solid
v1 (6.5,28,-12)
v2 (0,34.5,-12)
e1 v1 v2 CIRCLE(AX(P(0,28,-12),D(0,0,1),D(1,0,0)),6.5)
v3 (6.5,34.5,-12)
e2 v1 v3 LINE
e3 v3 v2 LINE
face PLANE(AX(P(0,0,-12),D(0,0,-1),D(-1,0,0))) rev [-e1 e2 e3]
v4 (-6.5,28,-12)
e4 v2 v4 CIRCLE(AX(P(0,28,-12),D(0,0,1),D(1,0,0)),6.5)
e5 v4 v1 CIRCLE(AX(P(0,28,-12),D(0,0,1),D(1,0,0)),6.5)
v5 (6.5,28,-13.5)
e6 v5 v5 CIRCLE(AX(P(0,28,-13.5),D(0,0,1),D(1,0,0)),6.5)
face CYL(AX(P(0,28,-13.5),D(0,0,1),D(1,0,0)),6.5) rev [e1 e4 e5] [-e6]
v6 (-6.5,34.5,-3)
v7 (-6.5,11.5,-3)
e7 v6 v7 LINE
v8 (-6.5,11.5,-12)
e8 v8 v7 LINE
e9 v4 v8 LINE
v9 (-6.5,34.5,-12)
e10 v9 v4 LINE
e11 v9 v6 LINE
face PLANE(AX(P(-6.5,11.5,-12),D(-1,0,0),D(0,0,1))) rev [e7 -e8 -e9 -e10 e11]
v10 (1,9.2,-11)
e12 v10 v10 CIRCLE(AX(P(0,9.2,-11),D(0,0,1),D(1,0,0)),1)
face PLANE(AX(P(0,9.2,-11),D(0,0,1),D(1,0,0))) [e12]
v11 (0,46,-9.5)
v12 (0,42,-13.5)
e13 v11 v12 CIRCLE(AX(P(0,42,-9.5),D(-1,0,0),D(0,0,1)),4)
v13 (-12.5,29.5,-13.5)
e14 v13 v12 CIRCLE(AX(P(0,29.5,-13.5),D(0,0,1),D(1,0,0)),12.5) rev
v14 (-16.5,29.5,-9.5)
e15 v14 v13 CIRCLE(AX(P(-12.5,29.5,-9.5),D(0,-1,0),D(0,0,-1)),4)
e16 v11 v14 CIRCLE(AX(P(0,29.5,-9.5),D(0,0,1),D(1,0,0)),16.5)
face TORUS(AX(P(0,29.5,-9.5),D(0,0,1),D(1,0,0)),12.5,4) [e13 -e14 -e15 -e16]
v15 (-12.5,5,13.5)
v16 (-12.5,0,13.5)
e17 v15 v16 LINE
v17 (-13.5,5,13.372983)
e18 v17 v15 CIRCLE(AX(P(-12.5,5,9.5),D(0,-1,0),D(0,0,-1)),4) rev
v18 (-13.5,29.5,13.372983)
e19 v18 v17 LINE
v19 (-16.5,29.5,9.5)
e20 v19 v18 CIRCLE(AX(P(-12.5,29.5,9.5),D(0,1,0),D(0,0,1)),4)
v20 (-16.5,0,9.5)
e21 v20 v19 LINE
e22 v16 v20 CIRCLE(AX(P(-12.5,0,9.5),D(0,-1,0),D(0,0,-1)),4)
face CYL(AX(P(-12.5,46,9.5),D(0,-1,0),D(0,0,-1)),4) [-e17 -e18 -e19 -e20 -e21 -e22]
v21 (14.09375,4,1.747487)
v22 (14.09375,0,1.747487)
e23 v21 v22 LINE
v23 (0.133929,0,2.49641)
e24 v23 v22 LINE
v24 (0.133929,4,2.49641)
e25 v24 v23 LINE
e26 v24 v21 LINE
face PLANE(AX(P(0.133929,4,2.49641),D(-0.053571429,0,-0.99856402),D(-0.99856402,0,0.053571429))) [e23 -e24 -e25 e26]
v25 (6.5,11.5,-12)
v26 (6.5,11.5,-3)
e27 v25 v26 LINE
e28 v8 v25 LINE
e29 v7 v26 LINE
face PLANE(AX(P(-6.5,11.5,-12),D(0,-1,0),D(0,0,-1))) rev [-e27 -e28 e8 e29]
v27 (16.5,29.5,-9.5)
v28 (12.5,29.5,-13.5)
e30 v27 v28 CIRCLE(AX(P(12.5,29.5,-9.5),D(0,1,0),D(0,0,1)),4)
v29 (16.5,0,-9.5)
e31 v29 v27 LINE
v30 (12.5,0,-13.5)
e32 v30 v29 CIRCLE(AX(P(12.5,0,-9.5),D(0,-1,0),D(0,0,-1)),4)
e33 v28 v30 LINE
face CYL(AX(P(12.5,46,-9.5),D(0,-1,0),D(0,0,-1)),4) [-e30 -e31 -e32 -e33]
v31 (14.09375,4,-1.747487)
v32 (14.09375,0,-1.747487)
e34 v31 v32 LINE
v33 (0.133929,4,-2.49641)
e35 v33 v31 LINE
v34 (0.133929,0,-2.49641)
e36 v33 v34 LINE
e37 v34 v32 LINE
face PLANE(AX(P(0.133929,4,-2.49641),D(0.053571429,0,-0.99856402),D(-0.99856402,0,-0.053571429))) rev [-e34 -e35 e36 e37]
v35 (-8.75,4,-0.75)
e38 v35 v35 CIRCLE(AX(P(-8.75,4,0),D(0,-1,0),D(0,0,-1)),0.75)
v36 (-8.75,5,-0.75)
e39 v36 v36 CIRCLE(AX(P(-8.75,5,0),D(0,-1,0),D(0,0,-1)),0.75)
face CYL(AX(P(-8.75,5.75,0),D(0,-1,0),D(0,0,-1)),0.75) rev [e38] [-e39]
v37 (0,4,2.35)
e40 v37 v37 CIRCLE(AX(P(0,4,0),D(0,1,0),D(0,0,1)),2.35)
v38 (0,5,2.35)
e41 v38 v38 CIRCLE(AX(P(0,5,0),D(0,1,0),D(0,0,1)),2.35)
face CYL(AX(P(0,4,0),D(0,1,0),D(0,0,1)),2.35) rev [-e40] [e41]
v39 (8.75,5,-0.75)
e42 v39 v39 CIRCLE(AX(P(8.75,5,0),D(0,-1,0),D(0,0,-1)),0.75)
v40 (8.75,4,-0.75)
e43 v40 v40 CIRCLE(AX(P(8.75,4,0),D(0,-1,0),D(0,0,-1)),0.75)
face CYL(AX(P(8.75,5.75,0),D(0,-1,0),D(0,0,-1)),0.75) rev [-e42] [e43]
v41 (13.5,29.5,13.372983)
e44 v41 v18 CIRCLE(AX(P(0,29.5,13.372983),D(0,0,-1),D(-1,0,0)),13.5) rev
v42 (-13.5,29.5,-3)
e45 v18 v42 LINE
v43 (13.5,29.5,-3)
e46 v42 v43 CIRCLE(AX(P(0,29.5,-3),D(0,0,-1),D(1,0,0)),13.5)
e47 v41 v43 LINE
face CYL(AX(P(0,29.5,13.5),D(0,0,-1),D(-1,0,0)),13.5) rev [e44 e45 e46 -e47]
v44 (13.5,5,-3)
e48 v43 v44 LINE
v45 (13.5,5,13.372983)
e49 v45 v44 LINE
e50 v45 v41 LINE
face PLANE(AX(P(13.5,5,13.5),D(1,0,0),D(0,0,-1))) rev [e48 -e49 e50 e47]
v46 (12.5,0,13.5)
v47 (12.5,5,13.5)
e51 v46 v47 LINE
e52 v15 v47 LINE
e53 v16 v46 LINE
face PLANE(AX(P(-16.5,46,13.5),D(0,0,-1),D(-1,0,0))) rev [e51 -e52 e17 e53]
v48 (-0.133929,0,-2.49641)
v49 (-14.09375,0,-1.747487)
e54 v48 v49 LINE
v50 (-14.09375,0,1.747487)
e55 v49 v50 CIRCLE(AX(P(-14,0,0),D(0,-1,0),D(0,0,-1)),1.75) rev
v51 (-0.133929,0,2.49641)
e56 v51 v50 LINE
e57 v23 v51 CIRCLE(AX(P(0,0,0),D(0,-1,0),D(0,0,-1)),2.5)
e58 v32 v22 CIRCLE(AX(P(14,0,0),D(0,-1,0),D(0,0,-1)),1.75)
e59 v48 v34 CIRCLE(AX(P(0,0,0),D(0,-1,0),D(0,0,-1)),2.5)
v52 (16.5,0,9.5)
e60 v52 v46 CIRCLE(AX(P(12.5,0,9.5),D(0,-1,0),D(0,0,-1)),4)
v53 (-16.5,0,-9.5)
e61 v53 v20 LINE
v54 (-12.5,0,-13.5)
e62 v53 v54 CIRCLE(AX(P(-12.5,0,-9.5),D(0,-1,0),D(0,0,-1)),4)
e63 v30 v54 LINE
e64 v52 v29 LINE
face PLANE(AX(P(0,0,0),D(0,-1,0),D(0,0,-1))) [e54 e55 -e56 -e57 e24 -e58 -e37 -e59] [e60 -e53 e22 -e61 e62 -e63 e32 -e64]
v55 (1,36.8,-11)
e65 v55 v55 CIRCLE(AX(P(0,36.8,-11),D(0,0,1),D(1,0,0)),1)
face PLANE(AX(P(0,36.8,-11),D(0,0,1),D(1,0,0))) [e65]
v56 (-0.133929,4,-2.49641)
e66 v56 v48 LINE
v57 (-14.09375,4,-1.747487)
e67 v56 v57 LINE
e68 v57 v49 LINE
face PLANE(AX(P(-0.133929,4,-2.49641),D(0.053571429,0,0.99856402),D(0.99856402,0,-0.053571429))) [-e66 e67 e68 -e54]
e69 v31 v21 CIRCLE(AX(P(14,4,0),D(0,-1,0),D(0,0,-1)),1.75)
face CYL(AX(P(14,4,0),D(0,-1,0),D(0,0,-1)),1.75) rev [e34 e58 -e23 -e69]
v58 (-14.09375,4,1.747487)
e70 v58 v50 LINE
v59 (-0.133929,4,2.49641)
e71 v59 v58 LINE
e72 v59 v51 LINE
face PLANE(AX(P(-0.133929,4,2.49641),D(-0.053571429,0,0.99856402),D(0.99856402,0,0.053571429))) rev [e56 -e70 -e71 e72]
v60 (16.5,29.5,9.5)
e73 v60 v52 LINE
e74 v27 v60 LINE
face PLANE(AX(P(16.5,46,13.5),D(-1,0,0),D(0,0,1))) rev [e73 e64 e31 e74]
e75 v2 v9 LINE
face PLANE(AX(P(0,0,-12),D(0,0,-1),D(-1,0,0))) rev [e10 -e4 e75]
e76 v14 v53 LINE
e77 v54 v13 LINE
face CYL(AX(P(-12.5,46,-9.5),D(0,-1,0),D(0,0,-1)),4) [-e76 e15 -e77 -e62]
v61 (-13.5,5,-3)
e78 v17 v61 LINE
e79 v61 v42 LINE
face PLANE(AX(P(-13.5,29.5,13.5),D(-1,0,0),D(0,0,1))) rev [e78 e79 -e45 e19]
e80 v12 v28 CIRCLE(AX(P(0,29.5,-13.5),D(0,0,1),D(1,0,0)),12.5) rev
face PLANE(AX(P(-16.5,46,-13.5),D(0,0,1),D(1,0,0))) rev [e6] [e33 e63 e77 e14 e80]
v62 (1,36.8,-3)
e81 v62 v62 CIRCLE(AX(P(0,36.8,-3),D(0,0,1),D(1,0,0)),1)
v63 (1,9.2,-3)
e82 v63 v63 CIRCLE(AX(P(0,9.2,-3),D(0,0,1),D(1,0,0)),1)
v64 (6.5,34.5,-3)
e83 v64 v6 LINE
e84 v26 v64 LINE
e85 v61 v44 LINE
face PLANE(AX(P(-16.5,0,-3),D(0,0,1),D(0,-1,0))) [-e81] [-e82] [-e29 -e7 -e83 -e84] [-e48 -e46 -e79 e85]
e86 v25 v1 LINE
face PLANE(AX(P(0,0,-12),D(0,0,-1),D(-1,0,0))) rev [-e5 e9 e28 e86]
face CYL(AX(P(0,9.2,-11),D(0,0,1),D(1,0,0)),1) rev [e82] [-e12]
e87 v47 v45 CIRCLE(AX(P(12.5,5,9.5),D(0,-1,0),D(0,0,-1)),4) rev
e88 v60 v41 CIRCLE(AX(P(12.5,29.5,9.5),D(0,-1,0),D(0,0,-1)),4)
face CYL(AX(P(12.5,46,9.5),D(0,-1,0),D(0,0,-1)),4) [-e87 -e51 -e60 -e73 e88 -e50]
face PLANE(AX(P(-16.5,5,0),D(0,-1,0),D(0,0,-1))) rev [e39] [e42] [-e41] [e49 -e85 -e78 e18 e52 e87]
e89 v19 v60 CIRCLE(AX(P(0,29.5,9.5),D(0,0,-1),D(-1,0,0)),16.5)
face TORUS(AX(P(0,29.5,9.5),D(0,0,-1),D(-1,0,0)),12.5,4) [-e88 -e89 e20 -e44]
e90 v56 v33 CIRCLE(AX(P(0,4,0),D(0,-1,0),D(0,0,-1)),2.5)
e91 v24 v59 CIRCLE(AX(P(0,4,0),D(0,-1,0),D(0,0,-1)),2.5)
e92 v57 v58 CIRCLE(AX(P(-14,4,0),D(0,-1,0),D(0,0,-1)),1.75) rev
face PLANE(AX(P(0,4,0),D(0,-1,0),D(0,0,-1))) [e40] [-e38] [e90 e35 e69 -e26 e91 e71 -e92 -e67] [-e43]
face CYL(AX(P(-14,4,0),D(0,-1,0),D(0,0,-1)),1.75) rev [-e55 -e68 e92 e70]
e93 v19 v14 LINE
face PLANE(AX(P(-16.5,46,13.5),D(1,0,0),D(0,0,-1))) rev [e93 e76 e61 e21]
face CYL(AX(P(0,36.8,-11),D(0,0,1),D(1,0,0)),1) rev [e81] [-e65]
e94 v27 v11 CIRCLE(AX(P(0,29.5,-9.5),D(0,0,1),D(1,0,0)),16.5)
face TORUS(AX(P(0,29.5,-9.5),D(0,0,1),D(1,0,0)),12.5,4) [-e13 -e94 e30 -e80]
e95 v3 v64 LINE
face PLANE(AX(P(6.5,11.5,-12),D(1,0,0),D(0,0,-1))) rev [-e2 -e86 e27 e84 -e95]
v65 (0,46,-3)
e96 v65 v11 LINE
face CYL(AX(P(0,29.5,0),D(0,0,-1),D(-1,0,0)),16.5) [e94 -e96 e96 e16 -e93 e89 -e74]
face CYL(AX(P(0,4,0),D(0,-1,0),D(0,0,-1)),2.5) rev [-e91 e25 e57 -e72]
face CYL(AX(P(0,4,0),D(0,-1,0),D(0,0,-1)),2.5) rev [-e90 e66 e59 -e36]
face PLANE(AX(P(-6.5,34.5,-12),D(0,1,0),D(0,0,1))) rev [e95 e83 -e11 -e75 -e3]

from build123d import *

# Parameters (mm, degrees)
SKETCH1_W           = 33
SKETCH1_H           = 27
BOSS_EXTRUDE1_DEPTH = 46
SKETCH3_W           = 16.5
SKETCH3_H           = 41
CUT_EXTRUDE2_DEPTH  = 59.200085911
FILLET3_R           = 16.5
SKETCH9_W           = 13
SKETCH9_H           = 23
CUT_EXTRUDE4_DEPTH  = 9
SKETCH10_R          = 6.5
CUT_EXTRUDE5_DEPTH  = 56.12259065
SKETCH11_R          = 1
CUT_EXTRUDE6_DEPTH  = 8
BOSS_EXTRUDE7_DEPTH = 16.5
FILLET5_R           = 4
CUT_EXTRUDE7_DEPTH  = 4
SKETCH17_R          = 1.3
CUT_EXTRUDE8_DEPTH  = 1.75
SKETCH18_R          = 2.35
CUT_EXTRUDE9_DEPTH  = 1
SKETCH19_R          = 0.75
CUT_EXTRUDE10_DEPTH = 1.75


# Some blends are built 0.0001 mm under size
with BuildPart() as part:
    # Sketch1 → Boss-Extrude1 (new body)
    with BuildSketch(Plane(origin=(0, 0, 0), x_dir=(1, 0, 0), z_dir=(0, 1, 0))):
        Rectangle(SKETCH1_W, SKETCH1_H)
    extrude(amount=BOSS_EXTRUDE1_DEPTH)

    # Sketch3 → Cut-Extrude2 (cut, through all)
    with BuildSketch(Plane(origin=(16.5, 0, 0), x_dir=(0, 0, -1), z_dir=(1, 0, 0))):
        with Locations((-5.25, 25.5)):
            Rectangle(SKETCH3_W, SKETCH3_H)
    extrude(amount=-CUT_EXTRUDE2_DEPTH, mode=Mode.SUBTRACT)

    # Fillet3
    fillet3_edges = [part.edges().sort_by_distance(p)[0] for p in [
        (-16.5, 46, -8.25),
        (16.5, 46, -8.25),
    ]]
    fillet(fillet3_edges, radius=FILLET3_R - 0.0001)  # a hair under: the kernel refuses the full size

    # Sketch9 → Cut-Extrude4 (cut)
    with BuildSketch(Plane.XY.offset(-3)):
        with Locations((0, 23)):
            Rectangle(SKETCH9_W, SKETCH9_H)
    extrude(amount=-CUT_EXTRUDE4_DEPTH, mode=Mode.SUBTRACT)

    # Sketch10 → Cut-Extrude5 (cut, through all)
    with BuildSketch(Plane.XY.offset(-12)):
        with Locations((0, 28)):
            Circle(SKETCH10_R)
    extrude(amount=-CUT_EXTRUDE5_DEPTH, mode=Mode.SUBTRACT)

    # Sketch11 → Cut-Extrude6 (cut)
    with BuildSketch(Plane.XY.offset(-3)):
        with Locations((0, 36.8)):
            Circle(SKETCH11_R)
        with Locations((0, 9.2)):
            Circle(SKETCH11_R)
    extrude(amount=-CUT_EXTRUDE6_DEPTH, mode=Mode.SUBTRACT)

    # Sketch15 → Boss-Extrude7 (add)
    with BuildSketch(Plane.XY.offset(-3)):
        with BuildLine():
            Line((13.5, 5), (13.5, 29.5))
            ThreePointArc((13.5, 29.5), (9.545941546, 39.045941546), (0, 43))
            ThreePointArc((0, 43), (-9.545941546, 39.045941546), (-13.5, 29.5))
            Line((-13.5, 29.5), (-13.5, 5))
            Line((-13.5, 5), (-16.5, 5))
            Line((-16.5, 5), (-16.5, 29.5))
            ThreePointArc((-16.5, 29.5), (-11.66726189, 41.16726189), (0, 46))
            ThreePointArc((0, 46), (11.66726189, 41.16726189), (16.5, 29.5))
            Line((16.5, 29.5), (16.5, 5))
            Line((16.5, 5), (13.5, 5))
        make_face()
    extrude(amount=BOSS_EXTRUDE7_DEPTH)

    # Fillet5
    # the kernel refuses this fillet: 4 mm, written as the material it takes off along each edge
    with BuildSketch(Plane(origin=(16.5, 29.5, 13.5), x_dir=(0, 0, -1), z_dir=(0, -1, 0))) as fillet5_piece_1:
        with BuildLine():
            CenterArc((FILLET5_R, -FILLET5_R), FILLET5_R, 90, 90)
            Line((0, -FILLET5_R), (0, 0))
            Line((0, 0), (FILLET5_R, 0))
        make_face()
    extrude(amount=39.5, mode=Mode.SUBTRACT)
    with BuildSketch(Plane(origin=(-16.5, 29.5, 13.5), x_dir=(0, 0, -1), z_dir=(0, -1, 0))) as fillet5_piece_2:
        with BuildLine():
            CenterArc((FILLET5_R, FILLET5_R), FILLET5_R, 180, 90)
            Line((0, FILLET5_R), (0, 0))
            Line((0, 0), (FILLET5_R, 0))
        make_face()
    extrude(amount=39.5, mode=Mode.SUBTRACT)
    with BuildSketch(Plane(origin=(-16.5, -10, -13.5), x_dir=(0, 0, 1), z_dir=(0, 1, 0))) as fillet5_piece_3:
        with BuildLine():
            CenterArc((FILLET5_R, FILLET5_R), FILLET5_R, 180, 90)
            Line((0, FILLET5_R), (0, 0))
            Line((0, 0), (FILLET5_R, 0))
        make_face()
    extrude(amount=39.5001, mode=Mode.SUBTRACT)
    with BuildSketch(Plane(origin=(16.5, -10, -13.5), x_dir=(0, 0, 1), z_dir=(0, 1, 0))) as fillet5_piece_4:
        with BuildLine():
            CenterArc((FILLET5_R, -FILLET5_R), FILLET5_R, 90, 90)
            Line((0, -FILLET5_R), (0, 0))
            Line((0, 0), (FILLET5_R, 0))
        make_face()
    extrude(amount=39.5001, mode=Mode.SUBTRACT)
    with BuildSketch(Plane(origin=(0.0001, 29.5001, -13.5), x_dir=(1, 0, 0), z_dir=(0, -1, 0))) as fillet5_piece_5:
        with BuildLine():
            CenterArc((16.4999 - FILLET5_R, FILLET5_R), FILLET5_R, 270, 90)
            Line((16.4999 - FILLET5_R, 0), (16.4999, 0))
            Line((16.4999, 0), (16.4999, FILLET5_R))
        make_face()
    revolve(axis=Axis((0.0001, 29.5001, -13.5), (0, 0, 1)), revolution_arc=90, mode=Mode.SUBTRACT)
    with BuildSketch(Plane(origin=(0, 29.5, 13.5), x_dir=(-1, 0, 0), z_dir=(0, -1, 0))) as fillet5_piece_6:
        with BuildLine():
            CenterArc((16.5 - FILLET5_R, FILLET5_R), FILLET5_R, 270, 90)
            Line((16.5 - FILLET5_R, 0), (16.5, 0))
            Line((16.5, 0), (16.5, FILLET5_R))
        make_face()
    revolve(axis=Axis((0, 29.5, 13.5), (0, 0, -1)), revolution_arc=180, mode=Mode.SUBTRACT)
    with BuildSketch(Plane(origin=(0.0001, 46, -13.5), x_dir=(0, 0, 1), z_dir=(-1, 0, 0))) as fillet5_piece_7:
        with BuildLine():
            CenterArc((FILLET5_R, -FILLET5_R), FILLET5_R, 90, 90)
            Line((0, -FILLET5_R), (0, 0))
            Line((0, 0), (FILLET5_R, 0))
        make_face()
    extrude(amount=0.0002, mode=Mode.SUBTRACT)
    with BuildSketch(Plane(origin=(-0.0001, 29.5001, -13.5), x_dir=(-1, 0, 0), z_dir=(0, -1, 0))) as fillet5_piece_8:
        with BuildLine():
            CenterArc((16.4999 - FILLET5_R, -FILLET5_R), FILLET5_R, 0, 90)
            Line((16.4999 - FILLET5_R, 0), (16.4999, 0))
            Line((16.4999, 0), (16.4999, -FILLET5_R))
        make_face()
    revolve(axis=Axis((-0.0001, 29.5001, -13.5), (0, 0, -1)), revolution_arc=90, mode=Mode.SUBTRACT)

    # Sketch4 → Cut-Extrude7 (cut)
    with BuildSketch(Plane.XZ):
        with BuildLine():
            Line((0.133928571, 2.49641005), (14.09375, 1.747487035))
            ThreePointArc((14.09375, 1.747487035), (15.75, 0), (14.09375, -1.747487035))
            Line((14.09375, -1.747487035), (0.133928571, -2.49641005))
            ThreePointArc((0.133928571, -2.49641005), (0, -2.5), (-0.133928571, -2.49641005))
            Line((-0.133928571, -2.49641005), (-14.09375, -1.747487035))
            ThreePointArc((-14.09375, -1.747487035), (-15.75, 0), (-14.09375, 1.747487035))
            Line((-14.09375, 1.747487035), (-0.133928571, 2.49641005))
            ThreePointArc((-0.133928571, 2.49641005), (0, 2.5), (0.133928571, 2.49641005))
        make_face()
    extrude(amount=-CUT_EXTRUDE7_DEPTH, mode=Mode.SUBTRACT)

    # Sketch17 → Cut-Extrude8 (cut)
    with BuildSketch(Plane.XZ.offset(-4)):
        with Locations(Location((0, 0, 0), (0, 0, 270))):
            Circle(SKETCH17_R)
    extrude(amount=-CUT_EXTRUDE8_DEPTH, mode=Mode.SUBTRACT)

    # Sketch18 → Cut-Extrude9 (cut)
    with BuildSketch(Plane(origin=(0, 5, 0), x_dir=(1, 0, 0), z_dir=(0, 1, 0))):
        with Locations(Location((0, 0, 0), (0, 0, 270))):
            Circle(SKETCH18_R)
    extrude(amount=-CUT_EXTRUDE9_DEPTH, mode=Mode.SUBTRACT)

    # Sketch19 → Cut-Extrude10 (cut)
    with BuildSketch(Plane.XZ.offset(-4)):
        with Locations(Location((-8.75, 0, 0), (0, 0, 270))):
            Circle(SKETCH19_R)
        with Locations(Location((8.75, 0, 0), (0, 0, 270))):
            Circle(SKETCH19_R)
    extrude(amount=-CUT_EXTRUDE10_DEPTH, mode=Mode.SUBTRACT)


solid = part.part
